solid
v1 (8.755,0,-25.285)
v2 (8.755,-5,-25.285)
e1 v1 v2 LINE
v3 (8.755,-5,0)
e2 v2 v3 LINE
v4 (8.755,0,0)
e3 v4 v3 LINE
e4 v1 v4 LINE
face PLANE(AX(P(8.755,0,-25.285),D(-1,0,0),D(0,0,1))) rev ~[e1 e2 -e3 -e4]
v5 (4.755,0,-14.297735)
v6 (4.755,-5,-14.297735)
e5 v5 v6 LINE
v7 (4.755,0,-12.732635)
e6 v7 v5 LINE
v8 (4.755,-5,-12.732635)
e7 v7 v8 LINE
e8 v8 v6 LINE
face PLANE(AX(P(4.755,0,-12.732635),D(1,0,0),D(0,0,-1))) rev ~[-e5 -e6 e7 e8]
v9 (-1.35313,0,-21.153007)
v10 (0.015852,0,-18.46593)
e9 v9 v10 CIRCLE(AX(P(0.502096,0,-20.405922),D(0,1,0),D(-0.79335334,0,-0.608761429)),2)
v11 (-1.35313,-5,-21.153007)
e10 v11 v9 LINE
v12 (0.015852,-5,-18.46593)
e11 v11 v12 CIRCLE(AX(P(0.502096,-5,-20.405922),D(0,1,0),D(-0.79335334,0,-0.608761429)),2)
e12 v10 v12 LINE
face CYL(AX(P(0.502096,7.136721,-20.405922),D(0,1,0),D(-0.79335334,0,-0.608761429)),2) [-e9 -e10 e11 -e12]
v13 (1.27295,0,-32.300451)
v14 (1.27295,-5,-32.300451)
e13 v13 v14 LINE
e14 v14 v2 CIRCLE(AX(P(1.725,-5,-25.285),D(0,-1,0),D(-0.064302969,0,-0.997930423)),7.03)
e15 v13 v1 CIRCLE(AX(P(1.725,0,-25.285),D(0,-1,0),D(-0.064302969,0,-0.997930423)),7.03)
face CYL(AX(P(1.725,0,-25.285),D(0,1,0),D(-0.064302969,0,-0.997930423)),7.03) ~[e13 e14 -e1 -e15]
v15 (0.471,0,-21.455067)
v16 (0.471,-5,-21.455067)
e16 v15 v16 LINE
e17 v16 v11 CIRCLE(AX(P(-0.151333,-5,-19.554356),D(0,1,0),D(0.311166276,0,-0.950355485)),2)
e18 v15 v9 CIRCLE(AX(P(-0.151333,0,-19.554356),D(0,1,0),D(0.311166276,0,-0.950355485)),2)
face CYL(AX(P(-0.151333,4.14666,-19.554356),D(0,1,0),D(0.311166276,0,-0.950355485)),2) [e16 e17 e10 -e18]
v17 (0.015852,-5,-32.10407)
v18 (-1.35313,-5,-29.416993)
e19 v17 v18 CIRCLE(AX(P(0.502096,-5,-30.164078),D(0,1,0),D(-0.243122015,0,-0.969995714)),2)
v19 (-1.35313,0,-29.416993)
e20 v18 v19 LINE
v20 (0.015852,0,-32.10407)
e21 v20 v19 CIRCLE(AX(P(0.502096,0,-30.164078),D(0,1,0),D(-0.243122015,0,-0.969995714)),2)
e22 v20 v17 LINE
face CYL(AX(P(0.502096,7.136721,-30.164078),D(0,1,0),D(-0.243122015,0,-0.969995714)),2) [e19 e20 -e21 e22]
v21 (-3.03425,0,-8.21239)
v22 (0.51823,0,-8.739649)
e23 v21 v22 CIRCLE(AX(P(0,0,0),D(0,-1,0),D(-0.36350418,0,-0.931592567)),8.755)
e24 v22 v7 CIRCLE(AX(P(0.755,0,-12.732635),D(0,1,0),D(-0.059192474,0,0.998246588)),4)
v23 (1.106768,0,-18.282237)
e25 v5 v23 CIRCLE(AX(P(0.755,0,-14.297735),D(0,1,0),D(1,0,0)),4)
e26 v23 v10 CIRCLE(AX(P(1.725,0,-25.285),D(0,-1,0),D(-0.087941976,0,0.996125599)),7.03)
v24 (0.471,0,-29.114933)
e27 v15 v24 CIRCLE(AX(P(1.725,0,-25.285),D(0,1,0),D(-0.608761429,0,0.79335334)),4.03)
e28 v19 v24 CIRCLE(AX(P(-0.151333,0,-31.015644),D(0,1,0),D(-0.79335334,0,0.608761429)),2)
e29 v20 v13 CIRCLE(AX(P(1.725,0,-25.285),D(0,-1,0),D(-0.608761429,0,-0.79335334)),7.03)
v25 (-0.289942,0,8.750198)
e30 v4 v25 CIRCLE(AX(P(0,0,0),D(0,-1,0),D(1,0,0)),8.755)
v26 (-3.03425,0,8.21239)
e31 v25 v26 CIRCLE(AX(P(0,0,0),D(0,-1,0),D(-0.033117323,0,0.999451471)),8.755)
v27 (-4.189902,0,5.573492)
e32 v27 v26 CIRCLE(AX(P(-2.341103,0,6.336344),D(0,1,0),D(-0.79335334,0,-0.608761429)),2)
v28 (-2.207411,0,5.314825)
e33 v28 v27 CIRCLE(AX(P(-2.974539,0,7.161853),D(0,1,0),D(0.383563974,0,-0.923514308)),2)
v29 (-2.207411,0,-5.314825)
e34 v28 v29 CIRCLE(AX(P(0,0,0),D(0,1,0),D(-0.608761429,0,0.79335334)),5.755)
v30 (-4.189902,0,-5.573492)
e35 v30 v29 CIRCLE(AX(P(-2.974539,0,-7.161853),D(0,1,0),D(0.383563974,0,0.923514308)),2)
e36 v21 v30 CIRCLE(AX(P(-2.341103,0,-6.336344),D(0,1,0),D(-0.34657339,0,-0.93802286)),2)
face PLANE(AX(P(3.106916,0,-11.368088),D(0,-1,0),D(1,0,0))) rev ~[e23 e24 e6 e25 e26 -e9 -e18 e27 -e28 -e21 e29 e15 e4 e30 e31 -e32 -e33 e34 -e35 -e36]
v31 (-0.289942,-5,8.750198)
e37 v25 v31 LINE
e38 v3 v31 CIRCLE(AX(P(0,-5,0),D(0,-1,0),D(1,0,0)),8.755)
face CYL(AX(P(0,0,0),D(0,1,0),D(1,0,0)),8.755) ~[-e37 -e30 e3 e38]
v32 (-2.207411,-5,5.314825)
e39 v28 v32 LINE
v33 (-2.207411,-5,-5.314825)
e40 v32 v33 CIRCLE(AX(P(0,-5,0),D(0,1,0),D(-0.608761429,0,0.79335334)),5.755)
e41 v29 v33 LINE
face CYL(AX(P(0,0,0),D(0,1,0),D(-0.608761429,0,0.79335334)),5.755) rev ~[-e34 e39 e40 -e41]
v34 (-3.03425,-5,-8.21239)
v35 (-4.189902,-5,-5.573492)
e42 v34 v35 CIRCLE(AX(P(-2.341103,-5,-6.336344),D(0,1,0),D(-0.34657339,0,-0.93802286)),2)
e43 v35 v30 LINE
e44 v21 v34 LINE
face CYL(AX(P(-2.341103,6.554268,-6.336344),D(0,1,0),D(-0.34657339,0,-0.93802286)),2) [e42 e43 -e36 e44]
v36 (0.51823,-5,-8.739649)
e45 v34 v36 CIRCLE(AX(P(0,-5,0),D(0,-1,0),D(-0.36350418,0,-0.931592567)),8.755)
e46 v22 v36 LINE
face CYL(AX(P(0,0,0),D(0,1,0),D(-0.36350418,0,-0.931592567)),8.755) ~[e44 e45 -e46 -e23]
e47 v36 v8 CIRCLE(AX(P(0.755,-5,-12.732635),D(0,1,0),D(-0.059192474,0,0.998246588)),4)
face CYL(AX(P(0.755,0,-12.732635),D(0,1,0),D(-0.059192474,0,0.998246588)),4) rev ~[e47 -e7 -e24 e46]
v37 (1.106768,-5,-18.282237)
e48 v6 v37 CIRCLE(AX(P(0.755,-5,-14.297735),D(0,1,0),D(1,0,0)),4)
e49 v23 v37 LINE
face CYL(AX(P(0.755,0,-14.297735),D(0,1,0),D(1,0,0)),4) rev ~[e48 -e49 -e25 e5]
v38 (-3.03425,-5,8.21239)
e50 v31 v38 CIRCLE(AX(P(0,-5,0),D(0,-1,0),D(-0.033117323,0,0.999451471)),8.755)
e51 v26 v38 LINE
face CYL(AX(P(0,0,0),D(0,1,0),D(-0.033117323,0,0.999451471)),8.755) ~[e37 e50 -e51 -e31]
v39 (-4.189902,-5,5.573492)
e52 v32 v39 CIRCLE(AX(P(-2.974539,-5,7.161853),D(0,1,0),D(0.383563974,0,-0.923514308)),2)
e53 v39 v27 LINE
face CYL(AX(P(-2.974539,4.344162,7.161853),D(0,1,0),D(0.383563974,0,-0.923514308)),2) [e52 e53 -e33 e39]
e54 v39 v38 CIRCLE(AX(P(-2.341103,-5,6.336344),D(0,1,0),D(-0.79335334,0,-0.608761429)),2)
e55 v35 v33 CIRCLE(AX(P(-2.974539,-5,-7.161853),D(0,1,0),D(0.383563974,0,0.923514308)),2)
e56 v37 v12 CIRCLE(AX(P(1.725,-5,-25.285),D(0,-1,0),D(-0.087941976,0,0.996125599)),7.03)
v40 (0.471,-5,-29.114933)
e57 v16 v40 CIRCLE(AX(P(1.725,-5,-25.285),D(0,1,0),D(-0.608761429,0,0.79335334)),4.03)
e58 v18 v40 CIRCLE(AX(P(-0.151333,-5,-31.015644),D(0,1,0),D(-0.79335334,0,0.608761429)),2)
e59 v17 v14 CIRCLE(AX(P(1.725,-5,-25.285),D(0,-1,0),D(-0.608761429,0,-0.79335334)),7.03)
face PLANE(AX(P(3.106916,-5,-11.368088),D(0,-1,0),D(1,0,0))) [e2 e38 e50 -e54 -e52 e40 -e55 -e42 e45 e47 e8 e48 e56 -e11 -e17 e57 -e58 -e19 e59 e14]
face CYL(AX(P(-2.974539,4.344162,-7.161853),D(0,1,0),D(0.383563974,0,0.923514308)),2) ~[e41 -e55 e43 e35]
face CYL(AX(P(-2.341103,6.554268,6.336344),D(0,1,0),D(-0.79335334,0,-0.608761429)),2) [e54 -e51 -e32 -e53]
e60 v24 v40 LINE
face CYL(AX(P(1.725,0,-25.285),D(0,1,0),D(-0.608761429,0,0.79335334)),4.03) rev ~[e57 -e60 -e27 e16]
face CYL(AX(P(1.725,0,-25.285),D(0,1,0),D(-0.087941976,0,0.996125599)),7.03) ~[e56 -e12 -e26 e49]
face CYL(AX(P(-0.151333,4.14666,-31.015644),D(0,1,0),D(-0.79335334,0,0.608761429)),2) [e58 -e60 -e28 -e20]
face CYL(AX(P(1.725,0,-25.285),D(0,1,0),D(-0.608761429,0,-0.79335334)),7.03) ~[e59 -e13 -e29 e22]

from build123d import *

# Parameters (mm, degrees)
F1_DEPTH    = 5
F2_T1_DEPTH = 18.1085359619
F2_T3_DEPTH = 13.6883237314
F2_T5_DEPTH = 19.2734411819
F2_T7_DEPTH = 13.2933208328


# Not quite as in the source:
# - a fillet or chamfer that OpenCascade refuses, or shapes differently, is made with other operations: its cross-section is extruded or revolved along the edge and cut away or added


with BuildPart() as f1:
    # F0 (on Front) → F1 (new body)
    with BuildSketch(Plane.XZ):
        with BuildLine():
            Line((8.755, -25.285), (8.755, 0))
            ThreePointArc((8.755, 0), (6.0873467679, 6.2923949596), (-0.2899421651, 8.7501976287))
            ThreePointArc((-0.2899421651, 8.7501976287), (-2.9511128894, 8.2426305094), (-5.329706311, 6.9458084942))
            Line((-5.329706311, 6.9458084942), (-3.5034220239, 4.5657484734))
            ThreePointArc((-3.5034220239, 4.5657484734), (5.755, 0), (-3.5034220239, -4.5657484734))
            Line((-3.5034220239, -4.5657484734), (-5.329706311, -6.9458084942))
            ThreePointArc((-5.329706311, -6.9458084942), (-4.2988977903, -7.6268933904), (-3.1824790985, -8.1560929242))
            ThreePointArc((-3.1824790985, -8.1560929242), (-1.3637045363, -8.648140548), (0.5182301058, -8.7396488807))
            ThreePointArc((0.5182301058, -8.7396488807), (3.4984394857, -9.8217007124), (4.755, -12.7326352339))
            Line((4.755, -12.7326352339), (4.755, -14.2977346441))
            ThreePointArc((4.755, -14.2977346441), (3.705175556, -16.9989314509), (1.1067679057, -18.2822370397))
            ThreePointArc((1.1067679057, -18.2822370397), (-0.8255248465, -18.7339906879), (-2.5545928459, -19.7077260178))
            Line((-2.5545928459, -19.7077260178), (-0.7283085589, -22.0877860386))
            ThreePointArc((-0.7283085589, -22.0877860386), (5.755, -25.285), (-0.7283085589, -28.4822139614))
            Line((-0.7283085589, -28.4822139614), (-2.5545928459, -30.8622739822))
            ThreePointArc((-2.5545928459, -30.8622739822), (-0.7476906173, -31.8657827127), (1.2729501298, -32.3004508704))
            ThreePointArc((1.2729501298, -32.3004508704), (6.5334815385, -30.4132945795), (8.755, -25.285))
        make_face()
    extrude(amount=F1_DEPTH)

    # F2: fillet of radius 2 on 8 edges, made by hand

    # F2_s2 → F2_t1 (cut)
    with BuildSketch(Plane.XZ.offset(-6.554267981)):
        with BuildLine():
            ThreePointArc((-3.9278099293, 5.1188215596), (-4.2625544155, 6.8913447905), (-3.0342500285, 8.2123901371))
            ThreePointArc((-3.0342500285, 8.2123901371), (-4.2296570401, 7.6655088757), (-5.329706311, 6.9458084942))
            Line((-5.329706311, 6.9458084942), (-3.9278099293, 5.1188215596))
        make_face()
        with BuildLine():
            ThreePointArc((-3.0342500285, -8.2123901371), (-4.2625544155, -6.8913447905), (-3.9278099293, -5.1188215596))
            Line((-3.9278099293, -5.1188215596), (-5.329706311, -6.9458084942))
            ThreePointArc((-5.329706311, -6.9458084942), (-4.2296570401, -7.6655088757), (-3.0342500285, -8.2123901371))
        make_face()
    extrude(amount=F2_T1_DEPTH, mode=Mode.SUBTRACT)

    # F2_s4 → F2_t3 (cut)
    with BuildSketch(Plane.XZ.offset(-4.3441618657)):
        with BuildLine():
            ThreePointArc((-2.2074106697, 5.3148248452), (-3.4912558515, 5.2297553021), (-4.561245298, 5.9443306041))
            Line((-4.561245298, 5.9443306041), (-3.5034220239, 4.5657484734))
            ThreePointArc((-3.5034220239, 4.5657484734), (-2.8798752345, 4.9826041016), (-2.2074106697, 5.3148248452))
        make_face()
        with BuildLine():
            ThreePointArc((-2.2074106697, -5.3148248452), (-3.4912558515, -5.2297553021), (-4.561245298, -5.9443306041))
            Line((-4.561245298, -5.9443306041), (-3.5034220239, -4.5657484734))
            ThreePointArc((-3.5034220239, -4.5657484734), (-2.8798752345, -4.9826041016), (-2.2074106697, -5.3148248452))
        make_face()
    extrude(amount=F2_T3_DEPTH, mode=Mode.SUBTRACT)

    # F2_s6 → F2_t5 (cut)
    with BuildSketch(Plane.XZ.offset(-7.1367205909)):
        with BuildLine():
            ThreePointArc((0.0158522318, -32.1040698711), (-1.3864892611, -30.8222917209), (-1.084610418, -28.9465555846))
            Line((-1.084610418, -28.9465555846), (-2.5545928459, -30.8622739822))
            ThreePointArc((-2.5545928459, -30.8622739822), (-1.3330660217, -31.6150183417), (0.0158522318, -32.1040698711))
        make_face()
        with BuildLine():
            ThreePointArc((-1.084610418, -21.6234444154), (-1.3864892611, -19.7477082791), (0.0158522318, -18.4659301289))
            ThreePointArc((0.0158522318, -18.4659301289), (-1.3330660217, -18.9549816583), (-2.5545928459, -19.7077260178))
            Line((-2.5545928459, -19.7077260178), (-1.084610418, -21.6234444154))
        make_face()
    extrude(amount=F2_T5_DEPTH, mode=Mode.SUBTRACT)

    # F2_s8 → F2_t7 (cut)
    with BuildSketch(Plane.XZ.offset(-4.1466604164)):
        with BuildLine():
            ThreePointArc((0.4709999062, -21.4550673942), (-0.7422563844, -21.46506549), (-1.7380393272, -20.7718792817))
            Line((-1.7380393272, -20.7718792817), (-0.7283085589, -22.0877860386))
            ThreePointArc((-0.7283085589, -22.0877860386), (-0.1554567483, -21.7206231375), (0.4709999062, -21.4550673942))
        make_face()
        with BuildLine():
            ThreePointArc((-1.7380393272, -29.7981207183), (-0.7422563844, -29.10493451), (0.4709999062, -29.1149326058))
            ThreePointArc((0.4709999062, -29.1149326058), (-0.1554567483, -28.8493768625), (-0.7283085589, -28.4822139614))
            Line((-0.7283085589, -28.4822139614), (-1.7380393272, -29.7981207183))
        make_face()
    extrude(amount=F2_T7_DEPTH, mode=Mode.SUBTRACT)


solid = f1.part
